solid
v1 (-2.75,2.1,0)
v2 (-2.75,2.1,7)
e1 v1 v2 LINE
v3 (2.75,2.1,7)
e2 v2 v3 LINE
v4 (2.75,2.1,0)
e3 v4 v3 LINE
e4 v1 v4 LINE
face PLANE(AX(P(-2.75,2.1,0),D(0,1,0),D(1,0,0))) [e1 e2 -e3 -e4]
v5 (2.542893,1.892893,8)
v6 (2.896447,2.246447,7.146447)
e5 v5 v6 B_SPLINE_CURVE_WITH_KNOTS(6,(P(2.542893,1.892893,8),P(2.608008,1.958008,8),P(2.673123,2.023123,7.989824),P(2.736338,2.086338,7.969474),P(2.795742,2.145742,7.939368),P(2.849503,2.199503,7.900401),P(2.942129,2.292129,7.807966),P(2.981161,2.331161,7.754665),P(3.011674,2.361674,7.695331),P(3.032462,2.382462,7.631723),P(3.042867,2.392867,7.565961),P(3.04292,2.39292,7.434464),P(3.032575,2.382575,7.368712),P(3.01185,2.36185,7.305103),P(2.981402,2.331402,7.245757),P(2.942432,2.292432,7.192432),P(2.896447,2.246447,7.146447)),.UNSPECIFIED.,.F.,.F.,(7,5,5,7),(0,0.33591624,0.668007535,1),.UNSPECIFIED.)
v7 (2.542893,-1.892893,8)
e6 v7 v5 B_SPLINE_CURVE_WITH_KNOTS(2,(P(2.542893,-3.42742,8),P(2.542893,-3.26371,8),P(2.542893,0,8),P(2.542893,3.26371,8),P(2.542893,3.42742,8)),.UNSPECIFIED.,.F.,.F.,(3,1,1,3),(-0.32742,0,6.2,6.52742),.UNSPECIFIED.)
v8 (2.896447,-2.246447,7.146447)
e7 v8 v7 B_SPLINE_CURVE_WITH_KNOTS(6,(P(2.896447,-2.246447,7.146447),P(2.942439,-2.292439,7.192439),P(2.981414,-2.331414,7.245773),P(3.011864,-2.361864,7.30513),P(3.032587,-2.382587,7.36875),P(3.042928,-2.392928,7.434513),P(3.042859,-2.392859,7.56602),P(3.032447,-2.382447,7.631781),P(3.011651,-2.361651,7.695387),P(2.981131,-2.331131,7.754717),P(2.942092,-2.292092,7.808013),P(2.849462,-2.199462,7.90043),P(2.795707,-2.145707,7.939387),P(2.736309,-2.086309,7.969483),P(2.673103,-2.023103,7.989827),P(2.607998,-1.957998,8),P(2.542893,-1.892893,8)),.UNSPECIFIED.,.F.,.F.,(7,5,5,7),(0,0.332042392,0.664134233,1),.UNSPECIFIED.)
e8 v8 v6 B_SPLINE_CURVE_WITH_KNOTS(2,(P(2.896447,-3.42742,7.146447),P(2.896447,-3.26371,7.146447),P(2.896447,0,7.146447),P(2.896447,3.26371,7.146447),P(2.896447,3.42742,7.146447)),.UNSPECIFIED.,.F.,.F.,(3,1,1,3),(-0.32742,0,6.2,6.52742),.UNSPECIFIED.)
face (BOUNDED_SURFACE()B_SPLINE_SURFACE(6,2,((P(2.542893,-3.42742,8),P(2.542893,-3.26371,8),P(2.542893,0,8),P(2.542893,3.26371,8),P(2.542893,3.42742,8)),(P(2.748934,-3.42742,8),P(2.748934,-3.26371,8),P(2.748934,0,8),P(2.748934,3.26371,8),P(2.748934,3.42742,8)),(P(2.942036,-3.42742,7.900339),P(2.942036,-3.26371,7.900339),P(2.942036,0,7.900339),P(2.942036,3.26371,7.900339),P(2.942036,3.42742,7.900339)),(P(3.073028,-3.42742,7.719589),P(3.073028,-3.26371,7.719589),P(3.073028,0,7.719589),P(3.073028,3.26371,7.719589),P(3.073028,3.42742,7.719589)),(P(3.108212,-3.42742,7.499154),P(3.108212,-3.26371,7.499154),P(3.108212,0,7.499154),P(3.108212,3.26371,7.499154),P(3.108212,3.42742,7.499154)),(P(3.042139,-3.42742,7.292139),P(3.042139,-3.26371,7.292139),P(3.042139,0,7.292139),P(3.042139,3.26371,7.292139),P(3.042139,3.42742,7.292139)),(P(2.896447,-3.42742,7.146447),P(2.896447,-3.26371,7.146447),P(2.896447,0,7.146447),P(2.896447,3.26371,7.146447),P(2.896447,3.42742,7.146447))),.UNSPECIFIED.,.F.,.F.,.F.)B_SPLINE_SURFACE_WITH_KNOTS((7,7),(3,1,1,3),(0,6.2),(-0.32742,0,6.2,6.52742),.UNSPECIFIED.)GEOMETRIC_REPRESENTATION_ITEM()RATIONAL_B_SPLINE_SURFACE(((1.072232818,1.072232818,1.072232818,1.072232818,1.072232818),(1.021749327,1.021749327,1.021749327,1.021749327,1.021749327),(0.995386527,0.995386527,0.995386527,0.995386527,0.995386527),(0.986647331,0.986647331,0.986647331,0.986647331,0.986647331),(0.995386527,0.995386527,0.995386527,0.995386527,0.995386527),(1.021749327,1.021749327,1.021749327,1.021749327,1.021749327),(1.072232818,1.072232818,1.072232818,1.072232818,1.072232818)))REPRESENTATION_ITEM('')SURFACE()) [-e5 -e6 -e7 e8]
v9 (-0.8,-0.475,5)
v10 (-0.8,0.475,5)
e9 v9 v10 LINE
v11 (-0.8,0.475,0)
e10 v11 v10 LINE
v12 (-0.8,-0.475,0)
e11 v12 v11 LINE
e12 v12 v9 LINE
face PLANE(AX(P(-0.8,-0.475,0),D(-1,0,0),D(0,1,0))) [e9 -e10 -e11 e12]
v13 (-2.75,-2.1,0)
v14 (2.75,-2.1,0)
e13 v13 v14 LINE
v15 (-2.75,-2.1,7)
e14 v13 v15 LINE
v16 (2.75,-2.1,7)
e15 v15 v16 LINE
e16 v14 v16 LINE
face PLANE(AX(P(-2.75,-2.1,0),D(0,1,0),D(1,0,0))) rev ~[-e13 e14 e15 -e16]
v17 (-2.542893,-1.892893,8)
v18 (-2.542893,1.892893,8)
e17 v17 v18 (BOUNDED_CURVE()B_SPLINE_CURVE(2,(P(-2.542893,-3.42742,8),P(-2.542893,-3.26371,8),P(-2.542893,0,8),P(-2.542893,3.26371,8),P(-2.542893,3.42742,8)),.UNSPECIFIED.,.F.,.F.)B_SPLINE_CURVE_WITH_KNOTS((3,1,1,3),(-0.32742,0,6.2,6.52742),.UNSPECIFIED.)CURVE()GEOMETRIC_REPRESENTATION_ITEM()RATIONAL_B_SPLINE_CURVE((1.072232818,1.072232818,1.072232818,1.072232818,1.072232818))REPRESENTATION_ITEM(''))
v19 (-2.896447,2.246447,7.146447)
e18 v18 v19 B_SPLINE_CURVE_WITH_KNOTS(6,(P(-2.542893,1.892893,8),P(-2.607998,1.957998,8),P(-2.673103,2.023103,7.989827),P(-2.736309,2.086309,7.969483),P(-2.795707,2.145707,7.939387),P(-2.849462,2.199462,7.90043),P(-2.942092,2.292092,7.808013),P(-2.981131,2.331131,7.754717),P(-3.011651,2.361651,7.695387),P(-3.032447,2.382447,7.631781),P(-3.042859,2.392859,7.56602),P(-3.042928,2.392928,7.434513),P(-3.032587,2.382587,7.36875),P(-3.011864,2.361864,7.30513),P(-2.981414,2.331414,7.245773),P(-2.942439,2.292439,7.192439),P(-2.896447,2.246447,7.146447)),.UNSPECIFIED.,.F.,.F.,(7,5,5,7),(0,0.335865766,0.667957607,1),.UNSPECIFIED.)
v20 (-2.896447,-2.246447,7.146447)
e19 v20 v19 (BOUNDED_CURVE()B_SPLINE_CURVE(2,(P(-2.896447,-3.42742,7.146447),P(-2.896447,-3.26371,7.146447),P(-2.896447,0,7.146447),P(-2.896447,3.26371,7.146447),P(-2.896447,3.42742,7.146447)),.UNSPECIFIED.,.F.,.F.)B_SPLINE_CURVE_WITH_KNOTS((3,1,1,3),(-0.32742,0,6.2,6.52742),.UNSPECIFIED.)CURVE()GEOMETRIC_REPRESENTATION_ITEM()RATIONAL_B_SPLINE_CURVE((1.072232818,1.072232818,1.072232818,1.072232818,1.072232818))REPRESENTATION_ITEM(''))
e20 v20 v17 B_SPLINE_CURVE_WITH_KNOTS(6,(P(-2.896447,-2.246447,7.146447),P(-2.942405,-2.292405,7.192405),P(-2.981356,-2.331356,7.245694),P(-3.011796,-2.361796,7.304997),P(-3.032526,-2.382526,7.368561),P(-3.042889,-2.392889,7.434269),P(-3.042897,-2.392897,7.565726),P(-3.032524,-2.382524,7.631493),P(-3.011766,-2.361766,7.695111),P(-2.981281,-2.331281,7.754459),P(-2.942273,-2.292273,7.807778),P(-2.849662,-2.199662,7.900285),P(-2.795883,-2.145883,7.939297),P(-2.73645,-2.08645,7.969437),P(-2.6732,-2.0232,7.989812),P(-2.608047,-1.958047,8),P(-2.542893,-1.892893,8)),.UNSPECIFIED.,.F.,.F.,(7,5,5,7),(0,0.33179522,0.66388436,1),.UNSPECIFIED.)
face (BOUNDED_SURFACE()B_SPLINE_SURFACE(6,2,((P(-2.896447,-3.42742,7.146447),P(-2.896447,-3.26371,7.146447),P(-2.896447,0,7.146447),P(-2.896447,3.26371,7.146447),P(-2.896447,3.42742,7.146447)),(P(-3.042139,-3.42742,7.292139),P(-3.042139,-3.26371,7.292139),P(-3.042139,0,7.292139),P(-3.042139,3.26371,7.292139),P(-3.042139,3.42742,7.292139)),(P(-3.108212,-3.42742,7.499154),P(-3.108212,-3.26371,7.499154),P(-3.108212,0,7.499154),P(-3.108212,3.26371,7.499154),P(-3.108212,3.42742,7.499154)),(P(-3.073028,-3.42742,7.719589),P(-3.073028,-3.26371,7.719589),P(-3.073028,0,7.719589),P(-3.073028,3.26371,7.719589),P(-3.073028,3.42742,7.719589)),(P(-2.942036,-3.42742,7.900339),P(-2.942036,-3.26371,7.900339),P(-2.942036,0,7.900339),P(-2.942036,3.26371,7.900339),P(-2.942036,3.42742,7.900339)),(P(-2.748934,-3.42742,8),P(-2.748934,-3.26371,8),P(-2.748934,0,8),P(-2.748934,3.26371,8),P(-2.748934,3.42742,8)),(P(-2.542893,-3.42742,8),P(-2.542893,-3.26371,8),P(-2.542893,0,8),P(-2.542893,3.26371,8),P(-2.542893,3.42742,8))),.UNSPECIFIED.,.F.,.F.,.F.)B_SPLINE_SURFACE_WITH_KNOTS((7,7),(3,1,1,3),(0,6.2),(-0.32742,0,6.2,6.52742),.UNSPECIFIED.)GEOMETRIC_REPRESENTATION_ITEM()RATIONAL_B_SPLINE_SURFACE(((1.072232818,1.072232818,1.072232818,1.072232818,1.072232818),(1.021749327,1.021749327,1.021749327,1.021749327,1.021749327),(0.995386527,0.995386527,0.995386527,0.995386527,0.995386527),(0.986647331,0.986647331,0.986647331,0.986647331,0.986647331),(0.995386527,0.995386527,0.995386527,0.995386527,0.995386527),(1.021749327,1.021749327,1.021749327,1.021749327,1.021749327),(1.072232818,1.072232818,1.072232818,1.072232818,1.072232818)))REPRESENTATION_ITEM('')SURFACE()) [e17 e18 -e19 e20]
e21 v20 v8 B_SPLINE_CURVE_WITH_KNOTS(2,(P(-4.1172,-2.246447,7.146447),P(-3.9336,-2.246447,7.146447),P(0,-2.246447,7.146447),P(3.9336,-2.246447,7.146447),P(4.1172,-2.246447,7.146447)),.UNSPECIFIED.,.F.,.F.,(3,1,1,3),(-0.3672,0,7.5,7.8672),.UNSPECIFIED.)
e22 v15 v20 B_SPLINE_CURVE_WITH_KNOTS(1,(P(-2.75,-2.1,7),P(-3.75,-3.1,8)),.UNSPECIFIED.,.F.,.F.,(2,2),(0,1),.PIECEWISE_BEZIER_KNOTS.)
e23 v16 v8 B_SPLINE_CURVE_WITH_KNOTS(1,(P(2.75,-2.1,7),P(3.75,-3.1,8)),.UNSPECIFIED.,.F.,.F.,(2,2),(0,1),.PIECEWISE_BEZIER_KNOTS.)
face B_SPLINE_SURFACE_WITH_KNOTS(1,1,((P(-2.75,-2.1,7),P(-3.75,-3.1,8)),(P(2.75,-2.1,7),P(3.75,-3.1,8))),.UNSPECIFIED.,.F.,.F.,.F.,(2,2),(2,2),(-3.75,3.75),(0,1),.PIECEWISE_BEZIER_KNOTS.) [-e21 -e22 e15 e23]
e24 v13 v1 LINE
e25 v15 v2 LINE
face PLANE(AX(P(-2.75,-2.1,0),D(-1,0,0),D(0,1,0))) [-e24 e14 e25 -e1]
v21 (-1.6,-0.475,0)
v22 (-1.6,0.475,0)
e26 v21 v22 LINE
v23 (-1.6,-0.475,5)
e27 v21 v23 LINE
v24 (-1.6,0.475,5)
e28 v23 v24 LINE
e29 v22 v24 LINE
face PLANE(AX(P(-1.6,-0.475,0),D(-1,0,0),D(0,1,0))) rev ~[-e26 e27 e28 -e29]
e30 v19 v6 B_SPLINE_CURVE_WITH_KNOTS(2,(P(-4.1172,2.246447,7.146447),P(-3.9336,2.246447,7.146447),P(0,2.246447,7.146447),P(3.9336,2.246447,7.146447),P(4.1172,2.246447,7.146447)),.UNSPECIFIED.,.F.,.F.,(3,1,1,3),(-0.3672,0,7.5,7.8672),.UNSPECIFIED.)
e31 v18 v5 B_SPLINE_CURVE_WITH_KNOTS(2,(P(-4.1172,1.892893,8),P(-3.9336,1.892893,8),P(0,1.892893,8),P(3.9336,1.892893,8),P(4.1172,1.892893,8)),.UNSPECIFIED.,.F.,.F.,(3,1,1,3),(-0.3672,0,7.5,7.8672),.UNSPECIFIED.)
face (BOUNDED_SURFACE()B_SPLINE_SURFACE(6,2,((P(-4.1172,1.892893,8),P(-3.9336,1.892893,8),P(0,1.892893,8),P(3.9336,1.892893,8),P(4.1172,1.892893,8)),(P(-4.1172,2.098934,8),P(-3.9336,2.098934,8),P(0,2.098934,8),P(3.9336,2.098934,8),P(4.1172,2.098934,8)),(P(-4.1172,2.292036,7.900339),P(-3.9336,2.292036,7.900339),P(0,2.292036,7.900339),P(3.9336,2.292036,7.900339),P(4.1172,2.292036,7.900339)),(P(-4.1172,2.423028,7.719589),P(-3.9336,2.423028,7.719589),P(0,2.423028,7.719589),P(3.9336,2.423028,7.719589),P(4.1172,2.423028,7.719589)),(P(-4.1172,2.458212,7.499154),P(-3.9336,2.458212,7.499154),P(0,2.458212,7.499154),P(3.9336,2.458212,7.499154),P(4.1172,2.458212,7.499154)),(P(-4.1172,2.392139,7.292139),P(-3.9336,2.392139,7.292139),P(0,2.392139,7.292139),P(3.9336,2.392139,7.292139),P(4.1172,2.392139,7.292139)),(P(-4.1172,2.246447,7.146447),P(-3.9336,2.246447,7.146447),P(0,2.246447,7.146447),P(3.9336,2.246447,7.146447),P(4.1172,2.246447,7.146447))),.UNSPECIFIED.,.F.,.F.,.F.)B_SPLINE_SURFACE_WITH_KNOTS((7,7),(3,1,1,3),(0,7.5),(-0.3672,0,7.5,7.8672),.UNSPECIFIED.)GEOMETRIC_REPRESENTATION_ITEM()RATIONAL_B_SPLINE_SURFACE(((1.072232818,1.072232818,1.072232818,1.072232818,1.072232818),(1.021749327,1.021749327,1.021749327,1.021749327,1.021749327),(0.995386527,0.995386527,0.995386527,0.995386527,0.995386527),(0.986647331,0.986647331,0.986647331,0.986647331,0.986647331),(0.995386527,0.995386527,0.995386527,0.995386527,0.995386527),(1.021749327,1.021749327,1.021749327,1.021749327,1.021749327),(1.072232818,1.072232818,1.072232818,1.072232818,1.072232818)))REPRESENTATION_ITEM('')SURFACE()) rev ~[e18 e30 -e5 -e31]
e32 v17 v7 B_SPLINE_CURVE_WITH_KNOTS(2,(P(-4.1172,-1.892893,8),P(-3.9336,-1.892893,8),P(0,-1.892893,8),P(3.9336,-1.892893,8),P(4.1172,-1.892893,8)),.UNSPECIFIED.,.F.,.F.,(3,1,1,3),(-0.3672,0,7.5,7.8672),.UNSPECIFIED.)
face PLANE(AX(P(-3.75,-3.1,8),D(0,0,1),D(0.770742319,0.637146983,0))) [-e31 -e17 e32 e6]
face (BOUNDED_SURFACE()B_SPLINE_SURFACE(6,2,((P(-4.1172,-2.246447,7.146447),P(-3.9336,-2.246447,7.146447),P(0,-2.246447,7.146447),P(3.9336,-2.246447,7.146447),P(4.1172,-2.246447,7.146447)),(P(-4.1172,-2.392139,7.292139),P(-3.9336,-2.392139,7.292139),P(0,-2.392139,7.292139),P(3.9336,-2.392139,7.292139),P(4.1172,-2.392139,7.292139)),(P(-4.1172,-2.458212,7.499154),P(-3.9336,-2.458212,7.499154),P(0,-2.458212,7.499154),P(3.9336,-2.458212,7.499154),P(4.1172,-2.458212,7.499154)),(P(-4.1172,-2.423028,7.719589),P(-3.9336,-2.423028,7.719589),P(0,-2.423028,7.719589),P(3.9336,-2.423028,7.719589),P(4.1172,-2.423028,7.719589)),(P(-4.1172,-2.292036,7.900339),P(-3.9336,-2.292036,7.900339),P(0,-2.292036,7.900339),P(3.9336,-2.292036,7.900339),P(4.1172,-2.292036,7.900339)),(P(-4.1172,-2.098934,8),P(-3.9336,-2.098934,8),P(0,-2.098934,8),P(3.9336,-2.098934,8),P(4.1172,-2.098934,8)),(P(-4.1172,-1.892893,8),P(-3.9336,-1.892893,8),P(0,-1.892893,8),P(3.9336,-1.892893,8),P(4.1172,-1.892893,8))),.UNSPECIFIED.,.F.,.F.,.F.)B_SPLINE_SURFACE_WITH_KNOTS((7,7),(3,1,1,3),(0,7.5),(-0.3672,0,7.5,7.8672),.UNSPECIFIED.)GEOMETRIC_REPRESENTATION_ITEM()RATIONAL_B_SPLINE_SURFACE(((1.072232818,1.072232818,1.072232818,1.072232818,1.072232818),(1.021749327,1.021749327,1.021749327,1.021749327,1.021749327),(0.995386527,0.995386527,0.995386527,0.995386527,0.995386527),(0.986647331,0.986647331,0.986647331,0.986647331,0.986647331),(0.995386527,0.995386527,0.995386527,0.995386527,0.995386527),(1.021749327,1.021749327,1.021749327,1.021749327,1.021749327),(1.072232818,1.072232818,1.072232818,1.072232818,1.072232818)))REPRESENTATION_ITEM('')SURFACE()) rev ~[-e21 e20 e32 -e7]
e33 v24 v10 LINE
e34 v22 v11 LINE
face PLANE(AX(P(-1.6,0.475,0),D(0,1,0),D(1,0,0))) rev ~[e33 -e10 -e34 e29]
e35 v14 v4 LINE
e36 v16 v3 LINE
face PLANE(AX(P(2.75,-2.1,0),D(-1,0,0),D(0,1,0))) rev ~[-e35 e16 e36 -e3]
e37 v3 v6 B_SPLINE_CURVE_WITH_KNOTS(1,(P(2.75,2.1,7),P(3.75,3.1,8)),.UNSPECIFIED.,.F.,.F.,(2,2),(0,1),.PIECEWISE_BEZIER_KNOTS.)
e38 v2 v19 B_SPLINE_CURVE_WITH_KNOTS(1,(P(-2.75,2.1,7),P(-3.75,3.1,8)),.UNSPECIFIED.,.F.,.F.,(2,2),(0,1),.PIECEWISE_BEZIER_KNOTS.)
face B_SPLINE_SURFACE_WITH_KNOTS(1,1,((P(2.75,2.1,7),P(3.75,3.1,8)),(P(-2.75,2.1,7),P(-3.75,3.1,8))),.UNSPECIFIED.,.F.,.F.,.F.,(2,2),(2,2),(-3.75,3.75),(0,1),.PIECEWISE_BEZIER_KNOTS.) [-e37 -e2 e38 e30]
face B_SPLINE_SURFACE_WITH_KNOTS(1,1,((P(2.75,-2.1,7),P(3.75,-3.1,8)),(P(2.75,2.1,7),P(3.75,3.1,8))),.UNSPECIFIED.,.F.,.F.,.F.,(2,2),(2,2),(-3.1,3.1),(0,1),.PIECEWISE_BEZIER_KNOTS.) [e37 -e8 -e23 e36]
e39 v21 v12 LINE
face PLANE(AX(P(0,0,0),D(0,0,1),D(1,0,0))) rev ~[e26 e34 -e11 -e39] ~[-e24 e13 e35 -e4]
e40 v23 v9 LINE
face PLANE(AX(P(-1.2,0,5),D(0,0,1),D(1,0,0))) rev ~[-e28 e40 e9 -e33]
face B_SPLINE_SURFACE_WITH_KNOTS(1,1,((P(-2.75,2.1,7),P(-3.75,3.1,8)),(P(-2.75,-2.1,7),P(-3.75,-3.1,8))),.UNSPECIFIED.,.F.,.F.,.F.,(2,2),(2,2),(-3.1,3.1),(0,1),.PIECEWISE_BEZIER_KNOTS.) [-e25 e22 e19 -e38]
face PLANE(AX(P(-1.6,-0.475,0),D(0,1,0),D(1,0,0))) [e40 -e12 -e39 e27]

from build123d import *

# Parameters (mm, degrees)
F0_W      = 5.5
F0_H      = 4.2
F1_DEPTH  = 7
F2_W      = 0.8
F2_H      = 0.95
F3_DEPTH  = 5
F1_FACE_W = 5.5
F1_FACE_H = 4.2
F4_DEPTH  = 1
F4_TAPER  = -45
F6_R      = 0.5


# Not quite as in the source:
# - a feature of the source that left no trace in its solid (it failed there, or was rolled back) is left out


with BuildPart() as f1:
    # F0 (on Top) → F1 (new body)
    with BuildSketch(Plane.XY):
        Rectangle(F0_W, F0_H)
    extrude(amount=F1_DEPTH)

    # F2 (on Top) → F3 (cut)
    with BuildSketch(Plane.XY):
        with Locations((-1.2, 0)):
            Rectangle(F2_W, F2_H)
    extrude(amount=F3_DEPTH, mode=Mode.SUBTRACT)

    # F1_face (on face) → F4 (join)
    with BuildSketch(Plane.XY.offset(7)):
        Rectangle(F1_FACE_W, F1_FACE_H)
    extrude(amount=F4_DEPTH, taper=F4_TAPER)

    # F6
    f6_edges = [f1.edges().sort_by_distance(p)[0] for p in [
        (0, -3.1, 8),
        (3.75, 0, 8),
        (0, 3.1, 8),
        (-3.75, 0, 8),
    ]]
    fillet(f6_edges, radius=F6_R)


solid = f1.part
